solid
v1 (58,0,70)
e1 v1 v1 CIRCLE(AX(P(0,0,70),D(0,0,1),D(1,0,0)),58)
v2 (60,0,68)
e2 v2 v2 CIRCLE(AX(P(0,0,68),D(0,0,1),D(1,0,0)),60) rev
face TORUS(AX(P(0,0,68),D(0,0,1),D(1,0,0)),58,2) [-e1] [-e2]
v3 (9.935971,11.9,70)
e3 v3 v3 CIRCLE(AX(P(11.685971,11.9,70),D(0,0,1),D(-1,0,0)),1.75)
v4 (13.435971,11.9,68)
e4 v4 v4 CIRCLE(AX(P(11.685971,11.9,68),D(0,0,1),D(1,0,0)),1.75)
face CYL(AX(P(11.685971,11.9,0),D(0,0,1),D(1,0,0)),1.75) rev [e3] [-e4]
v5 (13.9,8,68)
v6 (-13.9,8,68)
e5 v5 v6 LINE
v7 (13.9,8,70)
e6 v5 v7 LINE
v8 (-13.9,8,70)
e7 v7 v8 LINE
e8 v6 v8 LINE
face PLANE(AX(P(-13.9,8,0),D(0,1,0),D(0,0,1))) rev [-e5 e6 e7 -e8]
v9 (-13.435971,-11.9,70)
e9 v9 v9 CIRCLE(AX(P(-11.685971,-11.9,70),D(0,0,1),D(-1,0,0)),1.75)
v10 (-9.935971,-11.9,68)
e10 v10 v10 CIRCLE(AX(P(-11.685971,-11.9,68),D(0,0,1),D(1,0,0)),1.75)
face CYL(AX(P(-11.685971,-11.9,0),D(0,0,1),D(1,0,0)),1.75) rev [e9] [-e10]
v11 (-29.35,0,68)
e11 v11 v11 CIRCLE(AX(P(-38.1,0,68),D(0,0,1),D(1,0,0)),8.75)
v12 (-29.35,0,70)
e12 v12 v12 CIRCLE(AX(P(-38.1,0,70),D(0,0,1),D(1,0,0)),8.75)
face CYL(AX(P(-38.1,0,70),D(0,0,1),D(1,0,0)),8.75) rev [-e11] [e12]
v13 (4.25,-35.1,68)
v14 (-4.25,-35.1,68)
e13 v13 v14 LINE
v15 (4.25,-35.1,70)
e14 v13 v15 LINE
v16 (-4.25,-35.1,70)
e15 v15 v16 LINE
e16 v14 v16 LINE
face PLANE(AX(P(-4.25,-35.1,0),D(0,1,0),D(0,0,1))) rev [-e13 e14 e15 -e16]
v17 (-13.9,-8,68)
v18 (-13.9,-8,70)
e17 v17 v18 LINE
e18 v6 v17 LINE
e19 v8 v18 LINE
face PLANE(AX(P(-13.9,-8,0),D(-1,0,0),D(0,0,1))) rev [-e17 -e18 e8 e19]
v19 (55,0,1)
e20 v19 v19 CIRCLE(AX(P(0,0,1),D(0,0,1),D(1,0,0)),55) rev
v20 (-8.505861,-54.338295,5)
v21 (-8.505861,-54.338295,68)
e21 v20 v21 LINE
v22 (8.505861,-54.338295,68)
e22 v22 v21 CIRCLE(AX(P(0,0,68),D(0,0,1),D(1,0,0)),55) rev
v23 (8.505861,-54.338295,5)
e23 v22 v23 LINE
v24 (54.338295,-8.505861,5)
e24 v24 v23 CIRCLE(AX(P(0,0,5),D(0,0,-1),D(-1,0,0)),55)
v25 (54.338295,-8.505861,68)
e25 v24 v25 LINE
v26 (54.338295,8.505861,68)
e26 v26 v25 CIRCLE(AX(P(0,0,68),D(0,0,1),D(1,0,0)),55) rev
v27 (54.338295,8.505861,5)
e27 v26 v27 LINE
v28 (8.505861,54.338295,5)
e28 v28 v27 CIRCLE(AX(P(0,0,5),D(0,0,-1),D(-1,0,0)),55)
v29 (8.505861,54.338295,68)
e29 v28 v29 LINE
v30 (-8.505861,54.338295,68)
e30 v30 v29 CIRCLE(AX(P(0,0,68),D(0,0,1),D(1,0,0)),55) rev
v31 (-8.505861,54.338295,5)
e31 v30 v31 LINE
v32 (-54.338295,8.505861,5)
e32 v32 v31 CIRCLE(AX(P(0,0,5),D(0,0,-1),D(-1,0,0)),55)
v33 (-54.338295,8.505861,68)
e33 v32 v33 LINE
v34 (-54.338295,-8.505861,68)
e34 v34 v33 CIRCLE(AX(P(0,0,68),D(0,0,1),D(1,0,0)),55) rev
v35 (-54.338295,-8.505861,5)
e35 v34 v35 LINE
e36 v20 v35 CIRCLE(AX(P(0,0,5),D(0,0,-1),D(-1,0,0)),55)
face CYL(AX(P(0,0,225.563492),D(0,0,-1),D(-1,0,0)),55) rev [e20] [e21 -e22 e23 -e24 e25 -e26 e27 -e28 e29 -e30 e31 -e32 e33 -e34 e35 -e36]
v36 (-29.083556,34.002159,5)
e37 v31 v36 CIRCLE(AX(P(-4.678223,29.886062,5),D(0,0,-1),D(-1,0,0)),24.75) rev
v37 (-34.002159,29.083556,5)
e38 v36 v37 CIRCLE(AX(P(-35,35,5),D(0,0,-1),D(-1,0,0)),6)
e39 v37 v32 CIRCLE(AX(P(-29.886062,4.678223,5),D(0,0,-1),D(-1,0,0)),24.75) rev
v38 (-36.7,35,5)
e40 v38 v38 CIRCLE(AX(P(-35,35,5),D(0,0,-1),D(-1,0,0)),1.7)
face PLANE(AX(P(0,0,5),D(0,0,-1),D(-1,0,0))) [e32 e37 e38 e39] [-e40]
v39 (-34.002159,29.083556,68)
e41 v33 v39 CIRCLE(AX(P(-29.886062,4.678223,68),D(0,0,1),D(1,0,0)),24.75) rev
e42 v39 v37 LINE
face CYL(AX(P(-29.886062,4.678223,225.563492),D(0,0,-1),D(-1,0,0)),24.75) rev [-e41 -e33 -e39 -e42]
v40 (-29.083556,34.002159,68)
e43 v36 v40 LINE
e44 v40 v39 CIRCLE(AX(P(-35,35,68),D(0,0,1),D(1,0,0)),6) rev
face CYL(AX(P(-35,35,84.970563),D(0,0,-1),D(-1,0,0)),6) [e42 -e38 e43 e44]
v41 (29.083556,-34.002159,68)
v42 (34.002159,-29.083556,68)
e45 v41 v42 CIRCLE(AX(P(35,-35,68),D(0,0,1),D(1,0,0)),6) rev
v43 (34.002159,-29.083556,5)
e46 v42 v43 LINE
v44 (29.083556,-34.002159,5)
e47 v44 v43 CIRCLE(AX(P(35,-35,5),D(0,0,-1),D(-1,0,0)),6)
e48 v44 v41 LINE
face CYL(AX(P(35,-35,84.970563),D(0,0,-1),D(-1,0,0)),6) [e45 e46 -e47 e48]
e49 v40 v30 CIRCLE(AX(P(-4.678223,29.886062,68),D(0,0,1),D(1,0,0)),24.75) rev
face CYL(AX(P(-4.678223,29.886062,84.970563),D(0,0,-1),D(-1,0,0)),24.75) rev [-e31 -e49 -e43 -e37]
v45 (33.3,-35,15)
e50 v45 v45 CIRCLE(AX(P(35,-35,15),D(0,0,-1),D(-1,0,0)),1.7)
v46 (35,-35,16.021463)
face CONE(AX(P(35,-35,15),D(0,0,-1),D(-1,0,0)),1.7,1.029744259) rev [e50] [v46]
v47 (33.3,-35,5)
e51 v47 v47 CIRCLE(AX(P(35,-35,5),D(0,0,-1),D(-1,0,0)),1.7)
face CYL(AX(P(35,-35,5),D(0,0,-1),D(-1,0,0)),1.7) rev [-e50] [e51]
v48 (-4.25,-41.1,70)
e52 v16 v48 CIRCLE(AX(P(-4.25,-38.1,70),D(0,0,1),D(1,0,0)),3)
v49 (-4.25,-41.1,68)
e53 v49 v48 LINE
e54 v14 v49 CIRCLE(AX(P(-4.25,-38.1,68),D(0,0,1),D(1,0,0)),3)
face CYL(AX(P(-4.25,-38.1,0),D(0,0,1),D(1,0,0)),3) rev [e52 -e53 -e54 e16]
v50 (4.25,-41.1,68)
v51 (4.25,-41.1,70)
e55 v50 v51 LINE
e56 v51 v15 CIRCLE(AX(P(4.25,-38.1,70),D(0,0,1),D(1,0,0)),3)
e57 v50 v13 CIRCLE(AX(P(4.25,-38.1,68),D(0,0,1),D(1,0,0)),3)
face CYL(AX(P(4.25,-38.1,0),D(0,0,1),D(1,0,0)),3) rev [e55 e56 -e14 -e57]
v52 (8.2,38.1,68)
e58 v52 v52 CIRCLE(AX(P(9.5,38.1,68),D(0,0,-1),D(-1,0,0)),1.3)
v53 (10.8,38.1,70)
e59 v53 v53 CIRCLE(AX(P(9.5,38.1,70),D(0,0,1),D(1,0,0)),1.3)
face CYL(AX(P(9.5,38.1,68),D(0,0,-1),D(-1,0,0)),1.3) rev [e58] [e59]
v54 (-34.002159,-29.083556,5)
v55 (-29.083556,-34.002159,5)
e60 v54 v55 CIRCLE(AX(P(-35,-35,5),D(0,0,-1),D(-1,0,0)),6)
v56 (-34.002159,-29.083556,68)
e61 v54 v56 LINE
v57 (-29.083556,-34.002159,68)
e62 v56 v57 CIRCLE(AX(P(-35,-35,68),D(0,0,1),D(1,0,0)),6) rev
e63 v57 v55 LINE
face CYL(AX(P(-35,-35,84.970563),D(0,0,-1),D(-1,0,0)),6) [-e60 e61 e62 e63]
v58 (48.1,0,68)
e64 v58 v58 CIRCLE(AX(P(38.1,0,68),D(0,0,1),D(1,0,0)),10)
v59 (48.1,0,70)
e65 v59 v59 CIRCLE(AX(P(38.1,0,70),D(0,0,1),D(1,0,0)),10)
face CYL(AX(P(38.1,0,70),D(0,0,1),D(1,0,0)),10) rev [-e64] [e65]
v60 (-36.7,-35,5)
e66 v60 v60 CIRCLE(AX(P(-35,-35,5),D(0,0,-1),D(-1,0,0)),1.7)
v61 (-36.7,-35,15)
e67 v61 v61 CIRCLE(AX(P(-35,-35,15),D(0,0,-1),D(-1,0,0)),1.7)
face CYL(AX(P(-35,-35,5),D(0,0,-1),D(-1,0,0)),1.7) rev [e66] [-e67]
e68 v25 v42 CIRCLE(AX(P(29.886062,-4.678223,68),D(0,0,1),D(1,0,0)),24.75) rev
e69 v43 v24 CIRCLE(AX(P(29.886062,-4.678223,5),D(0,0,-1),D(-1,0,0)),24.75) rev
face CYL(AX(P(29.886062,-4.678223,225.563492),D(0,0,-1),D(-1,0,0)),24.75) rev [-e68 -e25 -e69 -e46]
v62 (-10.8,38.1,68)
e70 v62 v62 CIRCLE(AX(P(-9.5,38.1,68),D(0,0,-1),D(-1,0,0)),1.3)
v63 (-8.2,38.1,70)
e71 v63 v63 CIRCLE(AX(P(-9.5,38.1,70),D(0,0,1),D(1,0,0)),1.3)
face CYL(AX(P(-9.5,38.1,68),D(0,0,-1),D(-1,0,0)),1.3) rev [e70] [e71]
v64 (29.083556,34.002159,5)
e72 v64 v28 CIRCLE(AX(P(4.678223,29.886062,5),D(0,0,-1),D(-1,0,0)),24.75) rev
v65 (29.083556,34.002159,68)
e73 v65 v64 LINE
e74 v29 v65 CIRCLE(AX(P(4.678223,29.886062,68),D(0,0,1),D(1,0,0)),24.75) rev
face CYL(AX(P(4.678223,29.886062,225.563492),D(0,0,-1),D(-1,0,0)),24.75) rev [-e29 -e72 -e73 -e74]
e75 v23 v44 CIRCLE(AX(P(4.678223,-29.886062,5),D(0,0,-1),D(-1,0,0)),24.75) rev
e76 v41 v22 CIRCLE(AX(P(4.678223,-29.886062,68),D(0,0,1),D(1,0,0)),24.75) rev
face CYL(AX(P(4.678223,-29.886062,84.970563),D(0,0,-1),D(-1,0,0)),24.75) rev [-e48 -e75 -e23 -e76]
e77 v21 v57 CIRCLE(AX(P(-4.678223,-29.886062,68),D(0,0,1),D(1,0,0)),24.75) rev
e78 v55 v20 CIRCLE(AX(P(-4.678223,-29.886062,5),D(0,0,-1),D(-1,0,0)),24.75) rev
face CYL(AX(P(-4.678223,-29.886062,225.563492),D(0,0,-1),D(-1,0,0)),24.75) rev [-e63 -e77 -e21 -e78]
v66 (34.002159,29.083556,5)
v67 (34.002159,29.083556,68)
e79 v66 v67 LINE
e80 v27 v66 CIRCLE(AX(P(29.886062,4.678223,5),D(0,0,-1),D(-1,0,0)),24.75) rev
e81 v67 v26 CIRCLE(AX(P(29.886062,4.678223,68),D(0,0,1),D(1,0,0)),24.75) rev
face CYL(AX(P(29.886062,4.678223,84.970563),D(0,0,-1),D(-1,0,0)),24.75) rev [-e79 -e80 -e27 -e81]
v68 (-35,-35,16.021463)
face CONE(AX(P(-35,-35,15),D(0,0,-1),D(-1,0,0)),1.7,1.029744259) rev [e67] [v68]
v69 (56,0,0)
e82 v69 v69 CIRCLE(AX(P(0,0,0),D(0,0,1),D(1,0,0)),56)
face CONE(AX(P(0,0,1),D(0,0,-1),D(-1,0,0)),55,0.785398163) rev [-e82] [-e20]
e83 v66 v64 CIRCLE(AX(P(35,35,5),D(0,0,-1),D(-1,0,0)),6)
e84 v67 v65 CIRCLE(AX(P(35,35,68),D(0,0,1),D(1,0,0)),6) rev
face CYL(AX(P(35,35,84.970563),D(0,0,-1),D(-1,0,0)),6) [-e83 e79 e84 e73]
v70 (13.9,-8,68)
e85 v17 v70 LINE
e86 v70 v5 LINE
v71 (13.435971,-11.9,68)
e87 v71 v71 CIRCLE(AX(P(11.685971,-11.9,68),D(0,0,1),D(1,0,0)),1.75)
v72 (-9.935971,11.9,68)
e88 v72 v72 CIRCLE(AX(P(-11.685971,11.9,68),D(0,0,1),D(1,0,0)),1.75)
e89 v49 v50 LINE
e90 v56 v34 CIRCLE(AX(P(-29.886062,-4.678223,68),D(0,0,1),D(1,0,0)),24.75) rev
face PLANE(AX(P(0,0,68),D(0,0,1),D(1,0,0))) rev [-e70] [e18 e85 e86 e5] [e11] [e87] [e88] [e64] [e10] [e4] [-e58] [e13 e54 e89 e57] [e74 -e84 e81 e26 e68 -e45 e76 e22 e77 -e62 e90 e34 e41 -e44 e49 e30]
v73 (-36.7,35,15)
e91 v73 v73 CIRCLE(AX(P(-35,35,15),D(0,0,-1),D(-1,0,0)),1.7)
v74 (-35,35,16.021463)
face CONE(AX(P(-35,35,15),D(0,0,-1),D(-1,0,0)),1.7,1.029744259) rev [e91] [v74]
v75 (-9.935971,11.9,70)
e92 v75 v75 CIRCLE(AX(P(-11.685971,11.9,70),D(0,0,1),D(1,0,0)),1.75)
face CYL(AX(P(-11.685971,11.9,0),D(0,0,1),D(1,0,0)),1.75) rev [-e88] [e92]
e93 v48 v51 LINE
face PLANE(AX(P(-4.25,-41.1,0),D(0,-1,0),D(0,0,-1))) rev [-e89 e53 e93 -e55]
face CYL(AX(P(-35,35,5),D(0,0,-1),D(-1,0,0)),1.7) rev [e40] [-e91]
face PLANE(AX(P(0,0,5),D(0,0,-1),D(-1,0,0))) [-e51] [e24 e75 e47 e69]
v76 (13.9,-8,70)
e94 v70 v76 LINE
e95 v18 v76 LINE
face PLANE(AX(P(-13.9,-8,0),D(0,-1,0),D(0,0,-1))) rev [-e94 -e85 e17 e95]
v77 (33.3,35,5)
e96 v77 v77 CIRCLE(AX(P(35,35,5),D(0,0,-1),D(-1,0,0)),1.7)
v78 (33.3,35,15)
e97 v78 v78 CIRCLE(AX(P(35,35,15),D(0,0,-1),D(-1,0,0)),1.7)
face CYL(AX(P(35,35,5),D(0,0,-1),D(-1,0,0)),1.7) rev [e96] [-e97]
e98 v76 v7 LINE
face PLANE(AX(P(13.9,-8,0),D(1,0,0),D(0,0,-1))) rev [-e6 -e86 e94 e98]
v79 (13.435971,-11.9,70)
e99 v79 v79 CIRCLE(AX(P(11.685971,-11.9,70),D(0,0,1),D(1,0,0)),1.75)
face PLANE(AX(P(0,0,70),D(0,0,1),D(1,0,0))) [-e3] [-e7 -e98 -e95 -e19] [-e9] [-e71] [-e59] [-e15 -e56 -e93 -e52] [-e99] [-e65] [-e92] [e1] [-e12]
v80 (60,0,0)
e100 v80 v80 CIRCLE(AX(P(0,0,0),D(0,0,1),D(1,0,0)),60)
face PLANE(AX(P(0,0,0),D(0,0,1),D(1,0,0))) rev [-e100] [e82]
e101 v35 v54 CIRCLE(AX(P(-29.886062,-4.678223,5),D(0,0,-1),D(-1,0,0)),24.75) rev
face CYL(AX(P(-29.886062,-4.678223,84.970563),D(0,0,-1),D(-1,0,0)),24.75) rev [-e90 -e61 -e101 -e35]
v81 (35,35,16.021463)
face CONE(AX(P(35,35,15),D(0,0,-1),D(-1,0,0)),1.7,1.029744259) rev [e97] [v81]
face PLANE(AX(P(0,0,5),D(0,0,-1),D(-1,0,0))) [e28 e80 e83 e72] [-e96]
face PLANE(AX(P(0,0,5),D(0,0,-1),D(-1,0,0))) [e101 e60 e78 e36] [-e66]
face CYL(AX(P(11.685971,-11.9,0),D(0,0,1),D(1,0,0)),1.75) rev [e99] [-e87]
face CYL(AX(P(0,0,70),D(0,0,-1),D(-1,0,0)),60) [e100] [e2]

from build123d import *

# Parameters (mm, degrees)
SKETCH1_R                    = 60
BOSS_EXTRUDE1_DEPTH          = 70
FILLET2_R                    = 2
SKETCH3_R                    = 55
CUT_EXTRUDE3_DEPTH           = 68
CHAMFER1_SIZE                = 1
BOSS_EXTRUDE3_DEPTH          = 63
FILLET5_R                    = 24.75
M3_CLEARANCE_HOLE1_D         = 3.4
M3_CLEARANCE_HOLE1_DEPTH     = 10
M3_CLEARANCE_HOLE1_TIP       = 1.021463052
M22_CLEARANCE_HOLE1_D        = 20
M18_CLEARANCE_HOLE1_D        = 17.5
SKETCH19_R                   = 1.75
SKETCH19_W                   = 27.8
SKETCH19_H                   = 16
CUT_EXTRUDE4_DEPTH           = 111
CUT_EXTRUDE8_DEPTH           = 111
M2_START                     = 68
M2_CLEARANCE_HOLE1_OUTLINE_R = 1.3
M2_CLEARANCE_HOLE1_DEPTH     = 2


# Read off the part's stored shape, not the designer's step: M2 Clearance Hole1
with BuildPart() as part:
    # Sketch1 → Boss-Extrude1 (new body)
    with BuildSketch(Plane.XY):
        Circle(SKETCH1_R)
    extrude(amount=BOSS_EXTRUDE1_DEPTH)

    # Fillet2
    fillet2_edges = [part.edges().sort_by_distance(p)[0] for p in [
        (-60, 0, 70),
    ]]
    fillet(fillet2_edges, radius=FILLET2_R)

    # Sketch3 → Cut-Extrude3 (cut)
    with BuildSketch(Plane(origin=(0, 0, 0), x_dir=(-1, 0, 0), z_dir=(0, 0, -1))):
        Circle(SKETCH3_R)
    extrude(amount=-CUT_EXTRUDE3_DEPTH, mode=Mode.SUBTRACT)

    # Chamfer1
    chamfer1_edges = [part.edges().sort_by_distance(p)[0] for p in [
        (55, 0, 0),
    ]]
    chamfer(chamfer1_edges, length=CHAMFER1_SIZE)

    # Sketch9 → Boss-Extrude3 (add)
    with BuildSketch(Plane(origin=(0, 0, 5), x_dir=(-1, 0, 0), z_dir=(0, 0, -1))):
        with BuildLine():
            ThreePointArc((-37.067445653, 40.632554347), (-38.890872965, 38.890872965), (-40.632554347, 37.067445653))
            ThreePointArc((-40.632554347, 37.067445653), (-30.757359313, 30.757359313), (-37.067445653, 40.632554347))
        make_face()
        with BuildLine():
            ThreePointArc((-37.067445653, -40.632554347), (-30.757359313, -30.757359313), (-40.632554347, -37.067445653))
            ThreePointArc((-40.632554347, -37.067445653), (-38.890872965, -38.890872965), (-37.067445653, -40.632554347))
        make_face()
        with BuildLine():
            ThreePointArc((37.067445653, 40.632554347), (30.757359313, 30.757359313), (40.632554347, 37.067445653))
            ThreePointArc((40.632554347, 37.067445653), (38.890872965, 38.890872965), (37.067445653, 40.632554347))
        make_face()
        with BuildLine():
            ThreePointArc((40.632554347, -37.067445653), (30.757359313, -30.757359313), (37.067445653, -40.632554347))
            ThreePointArc((37.067445653, -40.632554347), (38.890872965, -38.890872965), (40.632554347, -37.067445653))
        make_face()
    extrude(amount=-BOSS_EXTRUDE3_DEPTH)

    # Fillet5
    fillet5_edges = [part.edges().sort_by_distance(p)[0] for p in [
        (37.067445653, -40.632554347, 36.5),
        (40.632554347, -37.067445653, 36.5),
        (-37.067445653, 40.632554347, 36.5),
        (-40.632554347, 37.067445653, 36.5),
        (-40.632554347, -37.067445653, 36.5),
        (-37.067445653, -40.632554347, 36.5),
        (37.067445653, 40.632554347, 36.5),
        (40.632554347, 37.067445653, 36.5),
    ]]
    fillet(fillet5_edges, radius=FILLET5_R)

    # M3 Clearance Hole1
    with Locations(Plane(origin=(0, 0, 5), x_dir=(-1, 0, 0), z_dir=(0, 0, -1))):
        with Locations((-35, -35), (0, 0), (-35, 35), (35, -35), (35, 35)):
            Hole(M3_CLEARANCE_HOLE1_D / 2, depth=M3_CLEARANCE_HOLE1_DEPTH)
            with Locations((0, 0, -(M3_CLEARANCE_HOLE1_DEPTH + M3_CLEARANCE_HOLE1_TIP / 2))):  # 118° drill point
                Cone(0, M3_CLEARANCE_HOLE1_D / 2, M3_CLEARANCE_HOLE1_TIP, mode=Mode.SUBTRACT)

    # M22 Clearance Hole1 (through all)
    with Locations(Plane.XY.offset(70)):
        with Locations((38.1, 0)):
            Hole(M22_CLEARANCE_HOLE1_D / 2)

    # M18 Clearance Hole1 (through all)
    with Locations(Plane.XY.offset(70)):
        with Locations((-38.1, 0)):
            Hole(M18_CLEARANCE_HOLE1_D / 2)

    # Sketch19 → Cut-Extrude4 (cut, through all)
    with BuildSketch(Plane.XY.offset(70)):
        with Locations((-11.685971223, 11.9)):
            Circle(SKETCH19_R)
        with Locations((11.685971223, 11.9)):
            Circle(SKETCH19_R)
        with Locations((11.685971223, -11.9)):
            Circle(SKETCH19_R)
        with Locations((-11.685971223, -11.9)):
            Circle(SKETCH19_R)
        Rectangle(SKETCH19_W, SKETCH19_H)
    extrude(amount=-CUT_EXTRUDE4_DEPTH, mode=Mode.SUBTRACT)

    # Sketch25 → Cut-Extrude8 (cut, through all)
    with BuildSketch(Plane.XY.offset(70)):
        with BuildLine():
            Line((-4.25, -35.1), (4.25, -35.1))
            ThreePointArc((4.25, -35.1), (7.25, -38.1), (4.25, -41.1))
            Line((4.25, -41.1), (-4.25, -41.1))
            ThreePointArc((-4.25, -41.1), (-7.25, -38.1), (-4.25, -35.1))
        make_face()
    extrude(amount=-CUT_EXTRUDE8_DEPTH, mode=Mode.SUBTRACT)

    # M2 Clearance Hole1 outline → M2 Clearance Hole1 (cut)
    with BuildSketch(Plane.XY.offset(M2_START)):
        with Locations((-9.5, 38.1)):
            Circle(M2_CLEARANCE_HOLE1_OUTLINE_R)
        with Locations((9.5, 38.1)):
            Circle(M2_CLEARANCE_HOLE1_OUTLINE_R)
    extrude(amount=M2_CLEARANCE_HOLE1_DEPTH, mode=Mode.SUBTRACT)


solid = part.part
